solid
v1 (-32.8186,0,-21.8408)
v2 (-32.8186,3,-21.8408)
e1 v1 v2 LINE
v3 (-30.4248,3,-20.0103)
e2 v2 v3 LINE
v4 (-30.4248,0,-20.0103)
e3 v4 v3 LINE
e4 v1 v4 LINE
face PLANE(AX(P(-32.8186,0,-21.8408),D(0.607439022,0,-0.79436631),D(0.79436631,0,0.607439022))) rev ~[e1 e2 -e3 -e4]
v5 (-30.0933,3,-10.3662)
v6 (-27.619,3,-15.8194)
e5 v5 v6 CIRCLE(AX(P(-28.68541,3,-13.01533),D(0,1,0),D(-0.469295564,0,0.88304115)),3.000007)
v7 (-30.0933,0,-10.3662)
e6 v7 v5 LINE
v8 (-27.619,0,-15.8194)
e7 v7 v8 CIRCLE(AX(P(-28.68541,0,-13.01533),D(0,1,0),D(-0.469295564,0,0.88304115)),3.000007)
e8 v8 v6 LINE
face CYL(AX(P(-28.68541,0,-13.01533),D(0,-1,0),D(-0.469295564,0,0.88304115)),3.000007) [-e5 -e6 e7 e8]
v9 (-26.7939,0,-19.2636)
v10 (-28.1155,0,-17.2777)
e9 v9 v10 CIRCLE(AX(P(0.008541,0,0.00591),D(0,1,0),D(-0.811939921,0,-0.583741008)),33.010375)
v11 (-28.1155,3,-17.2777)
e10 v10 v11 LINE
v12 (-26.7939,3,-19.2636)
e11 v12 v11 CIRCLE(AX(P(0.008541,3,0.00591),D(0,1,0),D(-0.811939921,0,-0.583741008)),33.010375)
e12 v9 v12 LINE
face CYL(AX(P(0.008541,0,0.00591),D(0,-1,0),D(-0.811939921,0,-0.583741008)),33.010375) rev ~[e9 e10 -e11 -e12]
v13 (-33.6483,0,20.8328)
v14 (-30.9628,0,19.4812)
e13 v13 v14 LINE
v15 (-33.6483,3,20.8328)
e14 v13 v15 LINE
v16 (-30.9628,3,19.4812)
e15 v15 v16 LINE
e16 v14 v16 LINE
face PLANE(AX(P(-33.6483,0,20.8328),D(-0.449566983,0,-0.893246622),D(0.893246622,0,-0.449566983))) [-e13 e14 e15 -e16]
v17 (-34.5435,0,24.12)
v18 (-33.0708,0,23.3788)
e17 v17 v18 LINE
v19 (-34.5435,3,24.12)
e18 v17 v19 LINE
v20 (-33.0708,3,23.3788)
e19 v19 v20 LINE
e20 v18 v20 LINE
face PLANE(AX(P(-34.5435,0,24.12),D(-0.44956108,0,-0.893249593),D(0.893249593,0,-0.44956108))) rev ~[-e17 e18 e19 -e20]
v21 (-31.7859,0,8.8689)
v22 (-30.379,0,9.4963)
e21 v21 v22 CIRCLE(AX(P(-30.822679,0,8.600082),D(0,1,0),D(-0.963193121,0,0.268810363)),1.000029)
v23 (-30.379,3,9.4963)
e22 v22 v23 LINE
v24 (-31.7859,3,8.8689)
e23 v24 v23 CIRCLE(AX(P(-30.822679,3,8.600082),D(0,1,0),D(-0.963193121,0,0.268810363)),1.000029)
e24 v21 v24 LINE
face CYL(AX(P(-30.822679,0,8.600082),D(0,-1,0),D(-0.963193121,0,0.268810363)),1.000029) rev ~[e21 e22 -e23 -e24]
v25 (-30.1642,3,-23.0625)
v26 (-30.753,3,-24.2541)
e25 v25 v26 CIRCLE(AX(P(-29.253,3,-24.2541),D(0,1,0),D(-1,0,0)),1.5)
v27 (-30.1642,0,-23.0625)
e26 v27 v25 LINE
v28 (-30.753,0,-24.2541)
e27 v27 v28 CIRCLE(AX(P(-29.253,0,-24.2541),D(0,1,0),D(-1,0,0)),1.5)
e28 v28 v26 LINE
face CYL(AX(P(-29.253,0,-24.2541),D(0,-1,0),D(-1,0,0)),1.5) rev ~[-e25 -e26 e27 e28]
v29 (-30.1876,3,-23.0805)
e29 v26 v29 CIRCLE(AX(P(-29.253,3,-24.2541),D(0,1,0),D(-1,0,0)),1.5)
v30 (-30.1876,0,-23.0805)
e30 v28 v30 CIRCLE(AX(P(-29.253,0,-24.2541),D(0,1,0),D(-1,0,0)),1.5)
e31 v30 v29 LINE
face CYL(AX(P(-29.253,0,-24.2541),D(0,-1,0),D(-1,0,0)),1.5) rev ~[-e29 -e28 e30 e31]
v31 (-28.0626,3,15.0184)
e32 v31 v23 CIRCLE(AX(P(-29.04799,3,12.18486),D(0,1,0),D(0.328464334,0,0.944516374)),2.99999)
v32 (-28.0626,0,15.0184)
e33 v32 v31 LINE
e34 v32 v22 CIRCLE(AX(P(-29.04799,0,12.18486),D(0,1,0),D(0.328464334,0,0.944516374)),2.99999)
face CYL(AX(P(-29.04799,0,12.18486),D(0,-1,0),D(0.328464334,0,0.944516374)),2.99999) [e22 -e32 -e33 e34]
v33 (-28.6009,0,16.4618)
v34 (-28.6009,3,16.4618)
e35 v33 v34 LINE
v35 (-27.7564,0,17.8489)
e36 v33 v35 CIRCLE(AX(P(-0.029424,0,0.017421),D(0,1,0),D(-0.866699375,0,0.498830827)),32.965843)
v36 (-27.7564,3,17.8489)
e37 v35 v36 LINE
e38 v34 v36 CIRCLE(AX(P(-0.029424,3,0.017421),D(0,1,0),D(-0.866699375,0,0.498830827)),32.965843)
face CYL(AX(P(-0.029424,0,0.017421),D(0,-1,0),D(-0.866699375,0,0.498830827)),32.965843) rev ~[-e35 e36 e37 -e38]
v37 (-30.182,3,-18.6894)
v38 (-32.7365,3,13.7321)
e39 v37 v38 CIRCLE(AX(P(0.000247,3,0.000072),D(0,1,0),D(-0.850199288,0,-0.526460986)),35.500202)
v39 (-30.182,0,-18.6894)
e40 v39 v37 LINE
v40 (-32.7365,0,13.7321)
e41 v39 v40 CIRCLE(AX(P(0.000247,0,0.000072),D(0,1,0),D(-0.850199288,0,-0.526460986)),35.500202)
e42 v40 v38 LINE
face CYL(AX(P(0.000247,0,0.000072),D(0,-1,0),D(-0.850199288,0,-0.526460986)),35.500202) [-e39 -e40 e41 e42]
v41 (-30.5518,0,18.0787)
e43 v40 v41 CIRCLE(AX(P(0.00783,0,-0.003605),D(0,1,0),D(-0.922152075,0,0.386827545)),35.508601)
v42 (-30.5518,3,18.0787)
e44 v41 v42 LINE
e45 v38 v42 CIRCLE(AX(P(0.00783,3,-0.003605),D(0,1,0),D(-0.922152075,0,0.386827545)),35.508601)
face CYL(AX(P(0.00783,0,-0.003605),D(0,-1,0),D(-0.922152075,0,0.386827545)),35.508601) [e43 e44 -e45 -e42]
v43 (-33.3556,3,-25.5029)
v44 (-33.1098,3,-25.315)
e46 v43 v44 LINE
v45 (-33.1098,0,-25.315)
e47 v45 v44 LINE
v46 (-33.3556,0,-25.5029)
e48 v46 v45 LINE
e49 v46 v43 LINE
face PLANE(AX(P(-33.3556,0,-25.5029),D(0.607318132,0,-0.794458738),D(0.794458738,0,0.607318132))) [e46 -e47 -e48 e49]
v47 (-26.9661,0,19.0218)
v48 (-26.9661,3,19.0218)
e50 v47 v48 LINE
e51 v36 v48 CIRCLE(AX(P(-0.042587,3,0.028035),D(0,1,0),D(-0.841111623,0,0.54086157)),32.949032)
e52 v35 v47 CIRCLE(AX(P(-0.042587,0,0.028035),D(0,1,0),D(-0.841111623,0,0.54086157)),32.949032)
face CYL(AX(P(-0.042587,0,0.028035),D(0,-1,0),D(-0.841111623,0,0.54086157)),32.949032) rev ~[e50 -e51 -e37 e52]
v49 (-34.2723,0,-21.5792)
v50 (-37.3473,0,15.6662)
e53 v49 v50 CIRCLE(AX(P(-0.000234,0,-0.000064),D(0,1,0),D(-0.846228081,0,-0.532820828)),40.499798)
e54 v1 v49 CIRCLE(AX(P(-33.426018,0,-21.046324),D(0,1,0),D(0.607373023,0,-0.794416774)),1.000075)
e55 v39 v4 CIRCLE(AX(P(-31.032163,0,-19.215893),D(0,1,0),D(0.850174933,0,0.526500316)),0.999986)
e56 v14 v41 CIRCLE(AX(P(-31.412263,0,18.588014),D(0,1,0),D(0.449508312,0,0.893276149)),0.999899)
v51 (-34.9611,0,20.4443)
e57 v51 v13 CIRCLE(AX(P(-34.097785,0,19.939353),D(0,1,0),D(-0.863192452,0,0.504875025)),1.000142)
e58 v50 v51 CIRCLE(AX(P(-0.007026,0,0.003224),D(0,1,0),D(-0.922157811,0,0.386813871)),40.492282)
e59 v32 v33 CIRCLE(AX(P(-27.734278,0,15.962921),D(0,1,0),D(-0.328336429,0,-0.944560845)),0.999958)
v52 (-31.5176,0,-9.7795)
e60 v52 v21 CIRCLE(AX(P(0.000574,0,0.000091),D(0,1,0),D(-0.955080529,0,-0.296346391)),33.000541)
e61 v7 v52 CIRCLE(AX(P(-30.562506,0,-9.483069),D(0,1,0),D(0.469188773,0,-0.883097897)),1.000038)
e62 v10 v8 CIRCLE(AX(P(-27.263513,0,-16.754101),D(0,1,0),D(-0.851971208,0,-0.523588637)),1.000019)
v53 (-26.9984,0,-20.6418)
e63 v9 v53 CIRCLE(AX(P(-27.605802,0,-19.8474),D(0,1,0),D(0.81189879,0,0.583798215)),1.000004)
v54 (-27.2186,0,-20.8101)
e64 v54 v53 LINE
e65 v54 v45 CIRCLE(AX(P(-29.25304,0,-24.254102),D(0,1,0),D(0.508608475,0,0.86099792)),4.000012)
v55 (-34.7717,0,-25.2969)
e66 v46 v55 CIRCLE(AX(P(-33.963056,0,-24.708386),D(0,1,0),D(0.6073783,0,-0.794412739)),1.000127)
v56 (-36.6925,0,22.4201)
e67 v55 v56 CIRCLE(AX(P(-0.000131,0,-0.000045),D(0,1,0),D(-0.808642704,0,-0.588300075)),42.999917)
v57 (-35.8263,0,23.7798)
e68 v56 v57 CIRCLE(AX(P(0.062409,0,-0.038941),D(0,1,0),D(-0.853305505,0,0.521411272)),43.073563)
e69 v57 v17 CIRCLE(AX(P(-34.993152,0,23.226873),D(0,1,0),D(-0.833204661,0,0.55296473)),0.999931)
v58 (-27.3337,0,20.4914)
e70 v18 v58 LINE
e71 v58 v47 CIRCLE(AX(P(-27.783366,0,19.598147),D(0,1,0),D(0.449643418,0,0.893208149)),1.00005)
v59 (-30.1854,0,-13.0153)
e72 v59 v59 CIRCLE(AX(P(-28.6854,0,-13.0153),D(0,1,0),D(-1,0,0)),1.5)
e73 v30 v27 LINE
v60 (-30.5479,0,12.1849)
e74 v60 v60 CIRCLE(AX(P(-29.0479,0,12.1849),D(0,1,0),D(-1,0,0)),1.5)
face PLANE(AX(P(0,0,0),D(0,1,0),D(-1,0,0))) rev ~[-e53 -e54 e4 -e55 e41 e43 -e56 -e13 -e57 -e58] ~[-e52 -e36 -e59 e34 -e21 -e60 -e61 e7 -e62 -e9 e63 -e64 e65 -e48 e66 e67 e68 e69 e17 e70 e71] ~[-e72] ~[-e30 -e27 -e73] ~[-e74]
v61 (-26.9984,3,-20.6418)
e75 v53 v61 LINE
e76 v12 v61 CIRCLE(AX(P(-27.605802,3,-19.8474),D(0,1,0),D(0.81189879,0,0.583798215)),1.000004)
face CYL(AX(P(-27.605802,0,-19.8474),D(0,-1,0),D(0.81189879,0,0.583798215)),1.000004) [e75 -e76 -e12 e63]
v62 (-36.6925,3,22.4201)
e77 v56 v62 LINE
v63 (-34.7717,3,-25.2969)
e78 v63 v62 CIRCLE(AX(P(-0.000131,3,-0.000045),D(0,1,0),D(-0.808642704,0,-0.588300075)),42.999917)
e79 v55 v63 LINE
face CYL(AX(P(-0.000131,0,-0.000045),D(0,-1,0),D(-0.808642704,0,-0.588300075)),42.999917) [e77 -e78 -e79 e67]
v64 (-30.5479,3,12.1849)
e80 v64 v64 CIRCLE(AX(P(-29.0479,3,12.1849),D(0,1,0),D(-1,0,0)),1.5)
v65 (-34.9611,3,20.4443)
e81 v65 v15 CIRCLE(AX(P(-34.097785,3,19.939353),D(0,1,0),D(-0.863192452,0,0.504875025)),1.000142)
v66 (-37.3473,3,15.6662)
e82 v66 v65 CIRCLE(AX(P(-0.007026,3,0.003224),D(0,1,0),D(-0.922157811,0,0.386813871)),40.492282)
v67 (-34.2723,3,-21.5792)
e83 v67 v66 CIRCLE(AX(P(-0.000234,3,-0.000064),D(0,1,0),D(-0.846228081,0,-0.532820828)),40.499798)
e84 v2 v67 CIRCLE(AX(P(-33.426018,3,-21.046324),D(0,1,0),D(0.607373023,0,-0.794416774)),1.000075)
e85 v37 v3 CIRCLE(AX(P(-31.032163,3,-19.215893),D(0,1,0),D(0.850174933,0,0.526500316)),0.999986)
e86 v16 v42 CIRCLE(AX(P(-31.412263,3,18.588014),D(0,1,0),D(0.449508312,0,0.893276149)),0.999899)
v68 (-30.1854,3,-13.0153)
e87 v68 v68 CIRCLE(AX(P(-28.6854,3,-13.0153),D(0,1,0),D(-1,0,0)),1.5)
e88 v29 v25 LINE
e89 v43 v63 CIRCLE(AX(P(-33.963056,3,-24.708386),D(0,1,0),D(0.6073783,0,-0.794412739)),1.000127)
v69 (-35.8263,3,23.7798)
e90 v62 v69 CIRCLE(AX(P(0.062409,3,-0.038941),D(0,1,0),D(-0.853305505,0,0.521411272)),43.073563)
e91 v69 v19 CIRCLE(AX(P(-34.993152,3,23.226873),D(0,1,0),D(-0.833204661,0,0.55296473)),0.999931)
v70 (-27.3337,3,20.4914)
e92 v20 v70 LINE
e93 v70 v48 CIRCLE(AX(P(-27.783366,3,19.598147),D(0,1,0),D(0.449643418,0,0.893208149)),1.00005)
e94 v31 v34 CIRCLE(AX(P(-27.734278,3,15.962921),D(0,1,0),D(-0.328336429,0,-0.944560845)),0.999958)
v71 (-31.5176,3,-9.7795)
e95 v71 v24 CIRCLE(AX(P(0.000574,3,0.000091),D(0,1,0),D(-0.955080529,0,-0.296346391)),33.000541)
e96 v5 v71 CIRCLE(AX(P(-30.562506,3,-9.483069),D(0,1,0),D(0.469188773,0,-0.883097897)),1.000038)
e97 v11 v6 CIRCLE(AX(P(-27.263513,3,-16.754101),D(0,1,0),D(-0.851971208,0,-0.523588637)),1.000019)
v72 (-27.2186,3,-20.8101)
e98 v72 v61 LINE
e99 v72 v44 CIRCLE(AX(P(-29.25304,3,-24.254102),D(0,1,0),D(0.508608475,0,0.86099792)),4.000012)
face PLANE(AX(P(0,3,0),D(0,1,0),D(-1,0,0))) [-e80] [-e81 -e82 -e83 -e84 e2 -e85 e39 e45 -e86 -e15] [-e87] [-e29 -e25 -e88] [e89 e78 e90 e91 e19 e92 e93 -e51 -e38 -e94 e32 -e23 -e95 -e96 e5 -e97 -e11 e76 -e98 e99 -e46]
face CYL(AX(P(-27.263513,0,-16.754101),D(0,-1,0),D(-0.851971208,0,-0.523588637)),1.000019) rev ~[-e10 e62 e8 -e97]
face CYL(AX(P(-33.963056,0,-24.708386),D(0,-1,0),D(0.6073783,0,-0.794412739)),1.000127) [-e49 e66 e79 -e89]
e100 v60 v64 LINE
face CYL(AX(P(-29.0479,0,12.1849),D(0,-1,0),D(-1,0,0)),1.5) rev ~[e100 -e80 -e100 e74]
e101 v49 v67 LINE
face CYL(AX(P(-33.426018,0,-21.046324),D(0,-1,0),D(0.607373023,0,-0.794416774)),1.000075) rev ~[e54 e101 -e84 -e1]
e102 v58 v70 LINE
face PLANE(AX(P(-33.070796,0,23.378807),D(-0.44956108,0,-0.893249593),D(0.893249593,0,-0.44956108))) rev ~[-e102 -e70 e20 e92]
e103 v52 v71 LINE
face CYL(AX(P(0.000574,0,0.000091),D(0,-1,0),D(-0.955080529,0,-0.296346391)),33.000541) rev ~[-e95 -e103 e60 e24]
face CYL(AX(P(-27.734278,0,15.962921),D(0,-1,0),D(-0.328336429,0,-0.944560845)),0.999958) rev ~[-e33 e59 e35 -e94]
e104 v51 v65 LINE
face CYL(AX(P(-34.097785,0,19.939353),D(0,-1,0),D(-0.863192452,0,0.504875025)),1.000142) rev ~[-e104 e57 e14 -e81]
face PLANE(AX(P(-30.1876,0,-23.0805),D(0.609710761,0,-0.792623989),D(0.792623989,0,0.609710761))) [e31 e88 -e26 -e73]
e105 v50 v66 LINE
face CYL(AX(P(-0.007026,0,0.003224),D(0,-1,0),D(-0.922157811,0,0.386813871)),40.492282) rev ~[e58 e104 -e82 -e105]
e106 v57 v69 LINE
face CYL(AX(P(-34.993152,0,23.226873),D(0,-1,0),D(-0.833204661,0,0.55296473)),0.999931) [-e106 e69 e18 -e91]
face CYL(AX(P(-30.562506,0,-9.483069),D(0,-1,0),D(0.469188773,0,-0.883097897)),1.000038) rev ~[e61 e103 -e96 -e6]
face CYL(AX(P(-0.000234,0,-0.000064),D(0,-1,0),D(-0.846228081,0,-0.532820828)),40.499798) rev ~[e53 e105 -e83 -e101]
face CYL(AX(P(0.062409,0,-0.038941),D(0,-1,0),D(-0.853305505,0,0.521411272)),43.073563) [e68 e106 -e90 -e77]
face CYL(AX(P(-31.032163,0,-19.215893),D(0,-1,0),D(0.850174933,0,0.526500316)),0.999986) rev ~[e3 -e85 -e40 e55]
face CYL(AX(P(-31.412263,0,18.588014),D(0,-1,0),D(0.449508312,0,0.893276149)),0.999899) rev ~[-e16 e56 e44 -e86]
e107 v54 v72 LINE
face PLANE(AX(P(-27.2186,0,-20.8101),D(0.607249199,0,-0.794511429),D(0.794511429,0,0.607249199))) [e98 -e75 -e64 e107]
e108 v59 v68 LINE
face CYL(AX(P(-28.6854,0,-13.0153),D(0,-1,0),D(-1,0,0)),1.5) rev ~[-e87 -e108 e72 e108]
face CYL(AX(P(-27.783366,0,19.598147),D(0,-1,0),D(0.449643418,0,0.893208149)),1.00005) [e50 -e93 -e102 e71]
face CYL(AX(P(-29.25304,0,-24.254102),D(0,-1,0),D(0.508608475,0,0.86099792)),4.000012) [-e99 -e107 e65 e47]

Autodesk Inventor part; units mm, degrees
ref_plane "YZ Plane" through (0, 0, 0) normal (1, 0, 0) x (0, 1, 0)
ref_plane "XZ Plane" through (0, 0, 0) normal (0, 1, 0) x (-1, 0, 0)
ref_plane "XY Plane" through (0, 0, 0) normal (0, 0, 1) x (1, 0, 0)
sketch "Sketch1" plane through (0, 0, 0) normal (0, 1, 0) x (-1, 0, 0)
  arc A0 (34.7717, -25.2969) -> (36.6925, 22.4201) centre (0, 0) ccw
  circle A1 centre (28.6854, -13.0153) radius 1.5
  circle A2 centre (29.0479, 12.1849) radius 1.5
  line L0 (33.6483, 20.8328) -> (30.9628, 19.4812)
  arc A3 (32.7365, 13.7321) -> (30.5518, 18.0787) centre (0, 0) ccw
  arc A4 (37.3473, 15.6662) -> (34.9611, 20.4443) centre (0, 0) ccw
  arc A5 (34.9611, 20.4443) -> (33.6483, 20.8328) centre (34.0979, 19.9395) ccw
  arc A6 (30.9628, 19.4812) -> (30.5518, 18.0787) centre (31.4124, 18.5879) ccw
  line L1 (34.5435, 24.12) -> (27.3337, 20.4914)
  arc A7 (34.3646, 21.4319) -> (33.0708, 23.3788) centre (0, 0) ccw
  arc A8 (27.7564, 17.8489) -> (26.9661, 19.0218) centre (0, 0) ccw
  arc A9 (27.3337, 20.4914) -> (26.9661, 19.0218) centre (27.7833, 19.5982) ccw
  arc A10 (36.6925, 22.4201) -> (35.8263, 23.7798) centre (0, 0) ccw
  arc A11 (35.8263, 23.7798) -> (34.5435, 24.12) centre (34.9931, 23.2268) ccw
  circle A12 centre (29.253, -24.2541) radius 1.5
  arc A13 (27.2186, -20.8101) -> (33.1098, -25.315) centre (29.253, -24.2541) ccw
  arc A14 (28.0626, 15.0184) -> (30.379, 9.4963) centre (29.0479, 12.1849) ccw
  arc A15 (28.6009, 16.4618) -> (27.7564, 17.8489) centre (0, 0) ccw
  arc A16 (30.0933, -10.3662) -> (27.619, -15.8194) centre (28.6854, -13.0153) ccw
  arc A17 (31.5176, -9.7795) -> (31.7859, 8.8689) centre (0, 0) ccw
  arc A18 (26.7939, -19.2636) -> (28.1155, -17.2777) centre (0, 0) ccw
  arc A19 (30.0933, -10.3662) -> (31.5176, -9.7795) centre (30.5625, -9.4832) ccw
  arc A20 (28.1155, -17.2777) -> (27.619, -15.8194) centre (27.2635, -16.7541) ccw
  arc A21 (31.7859, 8.8689) -> (30.379, 9.4963) centre (30.8227, 8.6001) ccw
  arc A22 (28.0626, 15.0184) -> (28.6009, 16.4618) centre (27.7342, 15.963) ccw
  arc A23 (33.3556, -25.5029) -> (34.7717, -25.2969) centre (33.963, -24.7086) ccw
  arc A24 (26.7939, -19.2636) -> (26.9984, -20.6418) centre (27.6058, -19.8474) ccw
  arc A25 (34.2723, -21.5792) -> (33.0708, 23.3788) centre (0, 0) ccw
  arc A26 (30.182, -18.6894) -> (30.5518, 18.0787) centre (0, 0) ccw
  line L2 (32.8186, -21.8408) -> (30.4248, -20.0103)
  arc A27 (32.8186, -21.8408) -> (34.2723, -21.5792) centre (33.426, -21.0464) ccw
  arc A28 (30.182, -18.6894) -> (30.4248, -20.0103) centre (31.0322, -19.2159) ccw
  line L3 (33.3556, -25.5029) -> (33.1098, -25.315)
  line L4 (30.1876, -23.0805) -> (30.1642, -23.0625)
  line L5 (27.2186, -20.8101) -> (26.9984, -20.6418)
  point P0 (26.2158, -20.0433)
  point P1 (29.6958, -19.4528)
  dimension "d2" = 3
  dimension "d0" = 1
  dimension "d1" = 8
  dimension "d3" = 3
  dimension "d4" = 43
  dimension "d5" = 33
  dimension "d6" = 33
  dimension "d7" = 2.5339
  dimension "d8" = 3.4819
  dimension "d9" = 29.0479
  dimension "d10" = 1
  dimension "d11" = 1
  dimension "d12" = 40.5
  dimension "d13" = 1
  dimension "d14" = 1
  dimension "d15" = 43
  dimension "d16" = 40.5
  dimension "d17" = 35.5
  dimension "d18" = 64.12
  dimension "d19" = 2.5829
  dimension "d20" = 0.0025
  dimension "d21" = 35.1283
  dimension "d22" = 6.2779
  dimension "d23" = 40.0956
  dimension "d24" = 0.0494
  dimension "d25" = 37.8965
  dimension "d26" = 40.9793
  dimension "d27" = 30.7911
  dimension "d28" = 9.8494
  dimension "d29" = 8.7909
  dimension "d30" = 37.6697
  dimension "d31" = 0.0165
  dimension "d32" = 0
  dimension "d33" = 6.0158
  dimension "d34" = 0.0025
extrude "Extrusion1" add sketch "Sketch1" along normal blind 3
properties part number "Reverse Gear Link 1 updated" material "Copper"
